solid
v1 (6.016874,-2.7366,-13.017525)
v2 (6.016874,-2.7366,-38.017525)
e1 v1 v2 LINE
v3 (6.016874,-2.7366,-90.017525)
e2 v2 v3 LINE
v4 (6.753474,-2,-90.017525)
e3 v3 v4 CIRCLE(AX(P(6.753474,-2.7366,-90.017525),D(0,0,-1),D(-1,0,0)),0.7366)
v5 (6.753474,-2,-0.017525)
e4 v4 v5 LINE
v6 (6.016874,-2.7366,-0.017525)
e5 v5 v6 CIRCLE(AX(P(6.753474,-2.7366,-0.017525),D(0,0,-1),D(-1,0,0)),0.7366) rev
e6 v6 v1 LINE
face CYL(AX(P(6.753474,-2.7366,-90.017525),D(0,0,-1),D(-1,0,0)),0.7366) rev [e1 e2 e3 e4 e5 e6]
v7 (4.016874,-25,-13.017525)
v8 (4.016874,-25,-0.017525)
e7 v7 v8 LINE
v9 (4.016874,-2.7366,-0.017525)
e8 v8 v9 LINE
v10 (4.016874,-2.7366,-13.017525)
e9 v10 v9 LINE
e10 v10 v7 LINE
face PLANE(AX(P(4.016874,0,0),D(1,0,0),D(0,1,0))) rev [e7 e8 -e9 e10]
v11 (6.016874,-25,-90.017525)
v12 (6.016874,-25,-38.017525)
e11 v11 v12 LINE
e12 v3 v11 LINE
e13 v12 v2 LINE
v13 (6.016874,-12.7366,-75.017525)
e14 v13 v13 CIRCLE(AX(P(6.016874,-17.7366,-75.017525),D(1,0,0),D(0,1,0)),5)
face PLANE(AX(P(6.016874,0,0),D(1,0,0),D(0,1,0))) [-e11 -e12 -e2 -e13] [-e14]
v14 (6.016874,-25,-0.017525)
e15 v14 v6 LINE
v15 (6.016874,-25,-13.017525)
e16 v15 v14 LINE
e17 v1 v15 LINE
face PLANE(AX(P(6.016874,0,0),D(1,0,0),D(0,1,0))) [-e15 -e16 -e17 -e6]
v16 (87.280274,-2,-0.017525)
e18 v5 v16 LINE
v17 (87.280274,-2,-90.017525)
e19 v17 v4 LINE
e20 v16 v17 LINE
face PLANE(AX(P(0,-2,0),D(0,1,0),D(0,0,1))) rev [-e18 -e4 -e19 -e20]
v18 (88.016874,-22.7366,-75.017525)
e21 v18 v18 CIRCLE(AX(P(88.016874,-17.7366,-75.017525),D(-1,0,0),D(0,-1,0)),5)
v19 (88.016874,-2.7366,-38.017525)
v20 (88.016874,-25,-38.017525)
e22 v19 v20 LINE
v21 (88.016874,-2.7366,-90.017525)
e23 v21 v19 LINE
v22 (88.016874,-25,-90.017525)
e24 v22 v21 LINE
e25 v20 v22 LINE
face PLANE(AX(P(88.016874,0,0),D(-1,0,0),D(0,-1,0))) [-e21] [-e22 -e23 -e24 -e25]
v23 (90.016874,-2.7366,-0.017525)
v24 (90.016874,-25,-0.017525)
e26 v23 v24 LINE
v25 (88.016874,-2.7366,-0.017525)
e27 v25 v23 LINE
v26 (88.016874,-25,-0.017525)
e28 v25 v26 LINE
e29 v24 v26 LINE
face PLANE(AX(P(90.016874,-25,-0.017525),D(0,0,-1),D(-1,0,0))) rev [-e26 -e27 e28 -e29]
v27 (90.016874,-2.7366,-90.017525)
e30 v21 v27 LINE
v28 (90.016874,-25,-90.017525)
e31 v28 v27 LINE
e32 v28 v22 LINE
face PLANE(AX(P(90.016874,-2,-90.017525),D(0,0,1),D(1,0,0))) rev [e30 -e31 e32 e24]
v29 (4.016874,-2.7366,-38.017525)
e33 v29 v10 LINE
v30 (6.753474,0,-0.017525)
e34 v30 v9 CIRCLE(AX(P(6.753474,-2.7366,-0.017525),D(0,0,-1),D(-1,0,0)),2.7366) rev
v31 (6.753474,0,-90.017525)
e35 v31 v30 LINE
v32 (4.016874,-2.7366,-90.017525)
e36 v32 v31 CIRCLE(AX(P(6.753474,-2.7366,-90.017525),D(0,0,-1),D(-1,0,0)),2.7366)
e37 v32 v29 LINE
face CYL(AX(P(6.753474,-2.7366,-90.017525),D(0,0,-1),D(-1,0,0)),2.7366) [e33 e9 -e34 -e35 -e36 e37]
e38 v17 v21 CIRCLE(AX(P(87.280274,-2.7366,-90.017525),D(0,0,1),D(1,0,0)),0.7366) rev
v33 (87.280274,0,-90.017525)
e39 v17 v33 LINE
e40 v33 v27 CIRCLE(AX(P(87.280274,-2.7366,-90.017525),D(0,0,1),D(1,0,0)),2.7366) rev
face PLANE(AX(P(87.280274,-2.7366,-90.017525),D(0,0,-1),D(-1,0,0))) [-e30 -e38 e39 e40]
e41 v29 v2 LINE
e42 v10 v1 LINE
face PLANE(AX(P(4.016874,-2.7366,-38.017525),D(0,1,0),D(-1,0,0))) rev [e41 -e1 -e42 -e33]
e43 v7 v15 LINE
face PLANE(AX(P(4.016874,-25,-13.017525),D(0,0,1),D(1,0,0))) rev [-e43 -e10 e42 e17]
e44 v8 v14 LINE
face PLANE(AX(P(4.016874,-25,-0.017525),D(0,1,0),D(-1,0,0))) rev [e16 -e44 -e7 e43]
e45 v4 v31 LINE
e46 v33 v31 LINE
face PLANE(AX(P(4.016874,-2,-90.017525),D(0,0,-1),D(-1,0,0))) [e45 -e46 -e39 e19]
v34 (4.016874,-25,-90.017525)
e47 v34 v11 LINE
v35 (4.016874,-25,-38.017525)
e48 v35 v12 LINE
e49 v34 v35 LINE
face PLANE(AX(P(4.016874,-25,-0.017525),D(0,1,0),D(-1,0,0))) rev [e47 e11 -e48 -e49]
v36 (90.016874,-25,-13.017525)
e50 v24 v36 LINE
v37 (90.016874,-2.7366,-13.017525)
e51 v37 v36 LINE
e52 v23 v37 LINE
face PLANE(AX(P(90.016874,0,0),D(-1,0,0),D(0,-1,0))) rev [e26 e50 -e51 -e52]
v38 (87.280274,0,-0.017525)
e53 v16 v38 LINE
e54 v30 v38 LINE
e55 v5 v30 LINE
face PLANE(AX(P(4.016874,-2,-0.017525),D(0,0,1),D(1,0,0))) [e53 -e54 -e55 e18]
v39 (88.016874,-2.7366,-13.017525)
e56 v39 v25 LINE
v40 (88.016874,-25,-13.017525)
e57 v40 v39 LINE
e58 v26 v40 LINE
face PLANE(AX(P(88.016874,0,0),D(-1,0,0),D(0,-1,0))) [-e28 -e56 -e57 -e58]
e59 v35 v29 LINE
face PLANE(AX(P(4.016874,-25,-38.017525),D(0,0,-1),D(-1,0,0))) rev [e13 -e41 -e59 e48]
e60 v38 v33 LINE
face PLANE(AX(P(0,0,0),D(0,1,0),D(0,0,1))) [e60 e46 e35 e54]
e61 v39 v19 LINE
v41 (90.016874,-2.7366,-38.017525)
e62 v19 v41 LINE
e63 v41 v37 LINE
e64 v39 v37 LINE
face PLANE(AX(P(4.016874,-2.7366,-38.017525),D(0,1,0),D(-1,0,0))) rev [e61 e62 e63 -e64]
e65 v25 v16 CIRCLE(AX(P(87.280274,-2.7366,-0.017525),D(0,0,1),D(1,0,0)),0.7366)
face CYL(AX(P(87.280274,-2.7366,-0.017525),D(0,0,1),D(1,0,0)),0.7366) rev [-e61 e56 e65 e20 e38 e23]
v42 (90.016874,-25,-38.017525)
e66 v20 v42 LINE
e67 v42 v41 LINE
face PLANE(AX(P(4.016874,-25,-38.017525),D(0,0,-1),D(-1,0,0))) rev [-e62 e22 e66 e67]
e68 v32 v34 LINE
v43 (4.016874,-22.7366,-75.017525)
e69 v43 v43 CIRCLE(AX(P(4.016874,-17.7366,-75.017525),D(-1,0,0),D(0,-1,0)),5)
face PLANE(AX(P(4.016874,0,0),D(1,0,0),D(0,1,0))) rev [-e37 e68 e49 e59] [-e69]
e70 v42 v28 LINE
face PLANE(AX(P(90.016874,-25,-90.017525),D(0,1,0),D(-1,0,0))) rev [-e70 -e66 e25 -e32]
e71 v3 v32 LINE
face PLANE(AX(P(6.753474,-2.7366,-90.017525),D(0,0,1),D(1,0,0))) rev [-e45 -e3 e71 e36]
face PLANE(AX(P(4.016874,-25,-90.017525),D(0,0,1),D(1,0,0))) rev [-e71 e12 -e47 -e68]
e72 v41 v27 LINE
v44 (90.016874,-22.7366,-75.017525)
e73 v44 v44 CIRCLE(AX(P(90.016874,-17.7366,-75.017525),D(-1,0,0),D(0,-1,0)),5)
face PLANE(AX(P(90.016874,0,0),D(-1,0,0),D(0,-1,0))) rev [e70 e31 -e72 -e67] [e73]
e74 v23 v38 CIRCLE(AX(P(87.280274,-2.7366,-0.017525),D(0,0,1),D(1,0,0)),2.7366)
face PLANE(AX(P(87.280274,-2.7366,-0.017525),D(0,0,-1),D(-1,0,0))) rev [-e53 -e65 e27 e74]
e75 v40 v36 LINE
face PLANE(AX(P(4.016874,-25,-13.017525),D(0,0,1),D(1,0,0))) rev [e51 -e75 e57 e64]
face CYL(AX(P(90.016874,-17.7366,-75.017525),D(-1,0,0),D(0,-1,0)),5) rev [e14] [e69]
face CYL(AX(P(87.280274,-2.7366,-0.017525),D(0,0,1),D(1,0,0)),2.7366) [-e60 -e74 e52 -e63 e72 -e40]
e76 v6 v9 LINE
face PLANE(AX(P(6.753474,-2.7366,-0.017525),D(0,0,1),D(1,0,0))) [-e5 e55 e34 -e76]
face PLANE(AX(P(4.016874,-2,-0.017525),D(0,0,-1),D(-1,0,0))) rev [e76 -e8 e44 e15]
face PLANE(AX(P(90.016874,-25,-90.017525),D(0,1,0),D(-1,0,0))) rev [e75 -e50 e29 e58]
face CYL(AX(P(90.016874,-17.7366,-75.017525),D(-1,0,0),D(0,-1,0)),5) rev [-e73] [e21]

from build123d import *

# Parameters (mm, degrees)
SKETCH1_W                    = 86
SKETCH1_H                    = 90
BASE_FLANGE1_DEPTH           = 2
EDGE_FLANGE1_STRIP_W         = 9.4732
EDGE_FLANGE1_STRIP_H         = 2
EDGE_FLANGE1_STRIP_CUT_DEPTH = 90
EDGE_FLANGE1_DEPTH           = 90
EDGE_FLANGE2_STRIP_W         = 9.4732
EDGE_FLANGE2_STRIP_H         = 2
EDGE_FLANGE2_STRIP_CUT_DEPTH = 90
EDGE_FLANGE2_DEPTH           = 90
SKETCH13_W                   = 25
SKETCH13_H                   = 22.2634
CUT_EXTRUDE1_DEPTH           = 127.980922721
SKETCH15_R                   = 5
CUT_EXTRUDE2_DEPTH           = 127.980922721


# Sheet-metal steps are written as plain solids
with BuildPart() as part:
    # Sketch1 → Base-Flange1 (new body)
    with BuildSketch(Plane(origin=(0, 0, 0), x_dir=(1, 0, 0), z_dir=(0, 1, 0))):
        with Locations((47.016874378, 45.0175246)):
            Rectangle(SKETCH1_W, SKETCH1_H)
    extrude(amount=-BASE_FLANGE1_DEPTH)

    # Edge-Flange1 strip (across the edge) → Edge-Flange1 strip cut (cut)
    with BuildSketch(Plane(origin=(90.016874378, -2, -90.0175246), x_dir=(-1, 0, 0), z_dir=(0, 0, 1))):
        with Locations((-2, -1)):
            Rectangle(EDGE_FLANGE1_STRIP_W, EDGE_FLANGE1_STRIP_H)
    extrude(amount=EDGE_FLANGE1_STRIP_CUT_DEPTH, mode=Mode.SUBTRACT)

    # Edge-Flange1 section (across the edge) → Edge-Flange1 (add)
    with BuildSketch(Plane(origin=(90.016874378, -2, -90.0175246), x_dir=(-1, 0, 0), z_dir=(0, 0, 1))):
        with BuildLine():
            Line((0, 0.7366), (0, 23))
            Line((0, 23), (2, 23))
            Line((2, 23), (2, 0.7366))
            ThreePointArc((2, 0.7366), (2.215745145, 0.215745145), (2.7366, 0))
            Line((2.7366, 0), (2.7366, -2))
            ThreePointArc((2.7366, -2), (0.801531583, -1.198468417), (0, 0.7366))
        make_face()
    extrude(amount=EDGE_FLANGE1_DEPTH)

    # Edge-Flange2 strip (across the edge) → Edge-Flange2 strip cut (cut)
    with BuildSketch(Plane(origin=(4.016874378, -2, -0.0175246), x_dir=(1, 0, 0), z_dir=(0, 0, -1))):
        with Locations((-2, -1)):
            Rectangle(EDGE_FLANGE2_STRIP_W, EDGE_FLANGE2_STRIP_H)
    extrude(amount=EDGE_FLANGE2_STRIP_CUT_DEPTH, mode=Mode.SUBTRACT)

    # Edge-Flange2 section (across the edge) → Edge-Flange2 (add)
    with BuildSketch(Plane(origin=(4.016874378, -2, -0.0175246), x_dir=(1, 0, 0), z_dir=(0, 0, -1))):
        with BuildLine():
            Line((0, 0.7366), (0, 23))
            Line((0, 23), (2, 23))
            Line((2, 23), (2, 0.7366))
            ThreePointArc((2, 0.7366), (2.215745145, 0.215745145), (2.7366, 0))
            Line((2.7366, 0), (2.7366, -2))
            ThreePointArc((2.7366, -2), (0.801531583, -1.198468417), (0, 0.7366))
        make_face()
    extrude(amount=EDGE_FLANGE2_DEPTH)

    # Sketch13 → Cut-Extrude1 (cut, through all)
    with BuildSketch(Plane(origin=(90.016874378, 0, 0), x_dir=(0, 0, -1), z_dir=(1, 0, 0))):
        with Locations((25.5175246, -13.8683)):
            Rectangle(SKETCH13_W, SKETCH13_H)
    extrude(amount=-CUT_EXTRUDE1_DEPTH, mode=Mode.SUBTRACT)

    # Sketch15 → Cut-Extrude2 (cut, through all)
    with BuildSketch(Plane.ZY.offset(-4.016874378)):
        with Locations(Location((-75.0175246, -17.7366, 0), (0, 0, 270))):
            Circle(SKETCH15_R)
    extrude(amount=-CUT_EXTRUDE2_DEPTH, mode=Mode.SUBTRACT)


solid = part.part
